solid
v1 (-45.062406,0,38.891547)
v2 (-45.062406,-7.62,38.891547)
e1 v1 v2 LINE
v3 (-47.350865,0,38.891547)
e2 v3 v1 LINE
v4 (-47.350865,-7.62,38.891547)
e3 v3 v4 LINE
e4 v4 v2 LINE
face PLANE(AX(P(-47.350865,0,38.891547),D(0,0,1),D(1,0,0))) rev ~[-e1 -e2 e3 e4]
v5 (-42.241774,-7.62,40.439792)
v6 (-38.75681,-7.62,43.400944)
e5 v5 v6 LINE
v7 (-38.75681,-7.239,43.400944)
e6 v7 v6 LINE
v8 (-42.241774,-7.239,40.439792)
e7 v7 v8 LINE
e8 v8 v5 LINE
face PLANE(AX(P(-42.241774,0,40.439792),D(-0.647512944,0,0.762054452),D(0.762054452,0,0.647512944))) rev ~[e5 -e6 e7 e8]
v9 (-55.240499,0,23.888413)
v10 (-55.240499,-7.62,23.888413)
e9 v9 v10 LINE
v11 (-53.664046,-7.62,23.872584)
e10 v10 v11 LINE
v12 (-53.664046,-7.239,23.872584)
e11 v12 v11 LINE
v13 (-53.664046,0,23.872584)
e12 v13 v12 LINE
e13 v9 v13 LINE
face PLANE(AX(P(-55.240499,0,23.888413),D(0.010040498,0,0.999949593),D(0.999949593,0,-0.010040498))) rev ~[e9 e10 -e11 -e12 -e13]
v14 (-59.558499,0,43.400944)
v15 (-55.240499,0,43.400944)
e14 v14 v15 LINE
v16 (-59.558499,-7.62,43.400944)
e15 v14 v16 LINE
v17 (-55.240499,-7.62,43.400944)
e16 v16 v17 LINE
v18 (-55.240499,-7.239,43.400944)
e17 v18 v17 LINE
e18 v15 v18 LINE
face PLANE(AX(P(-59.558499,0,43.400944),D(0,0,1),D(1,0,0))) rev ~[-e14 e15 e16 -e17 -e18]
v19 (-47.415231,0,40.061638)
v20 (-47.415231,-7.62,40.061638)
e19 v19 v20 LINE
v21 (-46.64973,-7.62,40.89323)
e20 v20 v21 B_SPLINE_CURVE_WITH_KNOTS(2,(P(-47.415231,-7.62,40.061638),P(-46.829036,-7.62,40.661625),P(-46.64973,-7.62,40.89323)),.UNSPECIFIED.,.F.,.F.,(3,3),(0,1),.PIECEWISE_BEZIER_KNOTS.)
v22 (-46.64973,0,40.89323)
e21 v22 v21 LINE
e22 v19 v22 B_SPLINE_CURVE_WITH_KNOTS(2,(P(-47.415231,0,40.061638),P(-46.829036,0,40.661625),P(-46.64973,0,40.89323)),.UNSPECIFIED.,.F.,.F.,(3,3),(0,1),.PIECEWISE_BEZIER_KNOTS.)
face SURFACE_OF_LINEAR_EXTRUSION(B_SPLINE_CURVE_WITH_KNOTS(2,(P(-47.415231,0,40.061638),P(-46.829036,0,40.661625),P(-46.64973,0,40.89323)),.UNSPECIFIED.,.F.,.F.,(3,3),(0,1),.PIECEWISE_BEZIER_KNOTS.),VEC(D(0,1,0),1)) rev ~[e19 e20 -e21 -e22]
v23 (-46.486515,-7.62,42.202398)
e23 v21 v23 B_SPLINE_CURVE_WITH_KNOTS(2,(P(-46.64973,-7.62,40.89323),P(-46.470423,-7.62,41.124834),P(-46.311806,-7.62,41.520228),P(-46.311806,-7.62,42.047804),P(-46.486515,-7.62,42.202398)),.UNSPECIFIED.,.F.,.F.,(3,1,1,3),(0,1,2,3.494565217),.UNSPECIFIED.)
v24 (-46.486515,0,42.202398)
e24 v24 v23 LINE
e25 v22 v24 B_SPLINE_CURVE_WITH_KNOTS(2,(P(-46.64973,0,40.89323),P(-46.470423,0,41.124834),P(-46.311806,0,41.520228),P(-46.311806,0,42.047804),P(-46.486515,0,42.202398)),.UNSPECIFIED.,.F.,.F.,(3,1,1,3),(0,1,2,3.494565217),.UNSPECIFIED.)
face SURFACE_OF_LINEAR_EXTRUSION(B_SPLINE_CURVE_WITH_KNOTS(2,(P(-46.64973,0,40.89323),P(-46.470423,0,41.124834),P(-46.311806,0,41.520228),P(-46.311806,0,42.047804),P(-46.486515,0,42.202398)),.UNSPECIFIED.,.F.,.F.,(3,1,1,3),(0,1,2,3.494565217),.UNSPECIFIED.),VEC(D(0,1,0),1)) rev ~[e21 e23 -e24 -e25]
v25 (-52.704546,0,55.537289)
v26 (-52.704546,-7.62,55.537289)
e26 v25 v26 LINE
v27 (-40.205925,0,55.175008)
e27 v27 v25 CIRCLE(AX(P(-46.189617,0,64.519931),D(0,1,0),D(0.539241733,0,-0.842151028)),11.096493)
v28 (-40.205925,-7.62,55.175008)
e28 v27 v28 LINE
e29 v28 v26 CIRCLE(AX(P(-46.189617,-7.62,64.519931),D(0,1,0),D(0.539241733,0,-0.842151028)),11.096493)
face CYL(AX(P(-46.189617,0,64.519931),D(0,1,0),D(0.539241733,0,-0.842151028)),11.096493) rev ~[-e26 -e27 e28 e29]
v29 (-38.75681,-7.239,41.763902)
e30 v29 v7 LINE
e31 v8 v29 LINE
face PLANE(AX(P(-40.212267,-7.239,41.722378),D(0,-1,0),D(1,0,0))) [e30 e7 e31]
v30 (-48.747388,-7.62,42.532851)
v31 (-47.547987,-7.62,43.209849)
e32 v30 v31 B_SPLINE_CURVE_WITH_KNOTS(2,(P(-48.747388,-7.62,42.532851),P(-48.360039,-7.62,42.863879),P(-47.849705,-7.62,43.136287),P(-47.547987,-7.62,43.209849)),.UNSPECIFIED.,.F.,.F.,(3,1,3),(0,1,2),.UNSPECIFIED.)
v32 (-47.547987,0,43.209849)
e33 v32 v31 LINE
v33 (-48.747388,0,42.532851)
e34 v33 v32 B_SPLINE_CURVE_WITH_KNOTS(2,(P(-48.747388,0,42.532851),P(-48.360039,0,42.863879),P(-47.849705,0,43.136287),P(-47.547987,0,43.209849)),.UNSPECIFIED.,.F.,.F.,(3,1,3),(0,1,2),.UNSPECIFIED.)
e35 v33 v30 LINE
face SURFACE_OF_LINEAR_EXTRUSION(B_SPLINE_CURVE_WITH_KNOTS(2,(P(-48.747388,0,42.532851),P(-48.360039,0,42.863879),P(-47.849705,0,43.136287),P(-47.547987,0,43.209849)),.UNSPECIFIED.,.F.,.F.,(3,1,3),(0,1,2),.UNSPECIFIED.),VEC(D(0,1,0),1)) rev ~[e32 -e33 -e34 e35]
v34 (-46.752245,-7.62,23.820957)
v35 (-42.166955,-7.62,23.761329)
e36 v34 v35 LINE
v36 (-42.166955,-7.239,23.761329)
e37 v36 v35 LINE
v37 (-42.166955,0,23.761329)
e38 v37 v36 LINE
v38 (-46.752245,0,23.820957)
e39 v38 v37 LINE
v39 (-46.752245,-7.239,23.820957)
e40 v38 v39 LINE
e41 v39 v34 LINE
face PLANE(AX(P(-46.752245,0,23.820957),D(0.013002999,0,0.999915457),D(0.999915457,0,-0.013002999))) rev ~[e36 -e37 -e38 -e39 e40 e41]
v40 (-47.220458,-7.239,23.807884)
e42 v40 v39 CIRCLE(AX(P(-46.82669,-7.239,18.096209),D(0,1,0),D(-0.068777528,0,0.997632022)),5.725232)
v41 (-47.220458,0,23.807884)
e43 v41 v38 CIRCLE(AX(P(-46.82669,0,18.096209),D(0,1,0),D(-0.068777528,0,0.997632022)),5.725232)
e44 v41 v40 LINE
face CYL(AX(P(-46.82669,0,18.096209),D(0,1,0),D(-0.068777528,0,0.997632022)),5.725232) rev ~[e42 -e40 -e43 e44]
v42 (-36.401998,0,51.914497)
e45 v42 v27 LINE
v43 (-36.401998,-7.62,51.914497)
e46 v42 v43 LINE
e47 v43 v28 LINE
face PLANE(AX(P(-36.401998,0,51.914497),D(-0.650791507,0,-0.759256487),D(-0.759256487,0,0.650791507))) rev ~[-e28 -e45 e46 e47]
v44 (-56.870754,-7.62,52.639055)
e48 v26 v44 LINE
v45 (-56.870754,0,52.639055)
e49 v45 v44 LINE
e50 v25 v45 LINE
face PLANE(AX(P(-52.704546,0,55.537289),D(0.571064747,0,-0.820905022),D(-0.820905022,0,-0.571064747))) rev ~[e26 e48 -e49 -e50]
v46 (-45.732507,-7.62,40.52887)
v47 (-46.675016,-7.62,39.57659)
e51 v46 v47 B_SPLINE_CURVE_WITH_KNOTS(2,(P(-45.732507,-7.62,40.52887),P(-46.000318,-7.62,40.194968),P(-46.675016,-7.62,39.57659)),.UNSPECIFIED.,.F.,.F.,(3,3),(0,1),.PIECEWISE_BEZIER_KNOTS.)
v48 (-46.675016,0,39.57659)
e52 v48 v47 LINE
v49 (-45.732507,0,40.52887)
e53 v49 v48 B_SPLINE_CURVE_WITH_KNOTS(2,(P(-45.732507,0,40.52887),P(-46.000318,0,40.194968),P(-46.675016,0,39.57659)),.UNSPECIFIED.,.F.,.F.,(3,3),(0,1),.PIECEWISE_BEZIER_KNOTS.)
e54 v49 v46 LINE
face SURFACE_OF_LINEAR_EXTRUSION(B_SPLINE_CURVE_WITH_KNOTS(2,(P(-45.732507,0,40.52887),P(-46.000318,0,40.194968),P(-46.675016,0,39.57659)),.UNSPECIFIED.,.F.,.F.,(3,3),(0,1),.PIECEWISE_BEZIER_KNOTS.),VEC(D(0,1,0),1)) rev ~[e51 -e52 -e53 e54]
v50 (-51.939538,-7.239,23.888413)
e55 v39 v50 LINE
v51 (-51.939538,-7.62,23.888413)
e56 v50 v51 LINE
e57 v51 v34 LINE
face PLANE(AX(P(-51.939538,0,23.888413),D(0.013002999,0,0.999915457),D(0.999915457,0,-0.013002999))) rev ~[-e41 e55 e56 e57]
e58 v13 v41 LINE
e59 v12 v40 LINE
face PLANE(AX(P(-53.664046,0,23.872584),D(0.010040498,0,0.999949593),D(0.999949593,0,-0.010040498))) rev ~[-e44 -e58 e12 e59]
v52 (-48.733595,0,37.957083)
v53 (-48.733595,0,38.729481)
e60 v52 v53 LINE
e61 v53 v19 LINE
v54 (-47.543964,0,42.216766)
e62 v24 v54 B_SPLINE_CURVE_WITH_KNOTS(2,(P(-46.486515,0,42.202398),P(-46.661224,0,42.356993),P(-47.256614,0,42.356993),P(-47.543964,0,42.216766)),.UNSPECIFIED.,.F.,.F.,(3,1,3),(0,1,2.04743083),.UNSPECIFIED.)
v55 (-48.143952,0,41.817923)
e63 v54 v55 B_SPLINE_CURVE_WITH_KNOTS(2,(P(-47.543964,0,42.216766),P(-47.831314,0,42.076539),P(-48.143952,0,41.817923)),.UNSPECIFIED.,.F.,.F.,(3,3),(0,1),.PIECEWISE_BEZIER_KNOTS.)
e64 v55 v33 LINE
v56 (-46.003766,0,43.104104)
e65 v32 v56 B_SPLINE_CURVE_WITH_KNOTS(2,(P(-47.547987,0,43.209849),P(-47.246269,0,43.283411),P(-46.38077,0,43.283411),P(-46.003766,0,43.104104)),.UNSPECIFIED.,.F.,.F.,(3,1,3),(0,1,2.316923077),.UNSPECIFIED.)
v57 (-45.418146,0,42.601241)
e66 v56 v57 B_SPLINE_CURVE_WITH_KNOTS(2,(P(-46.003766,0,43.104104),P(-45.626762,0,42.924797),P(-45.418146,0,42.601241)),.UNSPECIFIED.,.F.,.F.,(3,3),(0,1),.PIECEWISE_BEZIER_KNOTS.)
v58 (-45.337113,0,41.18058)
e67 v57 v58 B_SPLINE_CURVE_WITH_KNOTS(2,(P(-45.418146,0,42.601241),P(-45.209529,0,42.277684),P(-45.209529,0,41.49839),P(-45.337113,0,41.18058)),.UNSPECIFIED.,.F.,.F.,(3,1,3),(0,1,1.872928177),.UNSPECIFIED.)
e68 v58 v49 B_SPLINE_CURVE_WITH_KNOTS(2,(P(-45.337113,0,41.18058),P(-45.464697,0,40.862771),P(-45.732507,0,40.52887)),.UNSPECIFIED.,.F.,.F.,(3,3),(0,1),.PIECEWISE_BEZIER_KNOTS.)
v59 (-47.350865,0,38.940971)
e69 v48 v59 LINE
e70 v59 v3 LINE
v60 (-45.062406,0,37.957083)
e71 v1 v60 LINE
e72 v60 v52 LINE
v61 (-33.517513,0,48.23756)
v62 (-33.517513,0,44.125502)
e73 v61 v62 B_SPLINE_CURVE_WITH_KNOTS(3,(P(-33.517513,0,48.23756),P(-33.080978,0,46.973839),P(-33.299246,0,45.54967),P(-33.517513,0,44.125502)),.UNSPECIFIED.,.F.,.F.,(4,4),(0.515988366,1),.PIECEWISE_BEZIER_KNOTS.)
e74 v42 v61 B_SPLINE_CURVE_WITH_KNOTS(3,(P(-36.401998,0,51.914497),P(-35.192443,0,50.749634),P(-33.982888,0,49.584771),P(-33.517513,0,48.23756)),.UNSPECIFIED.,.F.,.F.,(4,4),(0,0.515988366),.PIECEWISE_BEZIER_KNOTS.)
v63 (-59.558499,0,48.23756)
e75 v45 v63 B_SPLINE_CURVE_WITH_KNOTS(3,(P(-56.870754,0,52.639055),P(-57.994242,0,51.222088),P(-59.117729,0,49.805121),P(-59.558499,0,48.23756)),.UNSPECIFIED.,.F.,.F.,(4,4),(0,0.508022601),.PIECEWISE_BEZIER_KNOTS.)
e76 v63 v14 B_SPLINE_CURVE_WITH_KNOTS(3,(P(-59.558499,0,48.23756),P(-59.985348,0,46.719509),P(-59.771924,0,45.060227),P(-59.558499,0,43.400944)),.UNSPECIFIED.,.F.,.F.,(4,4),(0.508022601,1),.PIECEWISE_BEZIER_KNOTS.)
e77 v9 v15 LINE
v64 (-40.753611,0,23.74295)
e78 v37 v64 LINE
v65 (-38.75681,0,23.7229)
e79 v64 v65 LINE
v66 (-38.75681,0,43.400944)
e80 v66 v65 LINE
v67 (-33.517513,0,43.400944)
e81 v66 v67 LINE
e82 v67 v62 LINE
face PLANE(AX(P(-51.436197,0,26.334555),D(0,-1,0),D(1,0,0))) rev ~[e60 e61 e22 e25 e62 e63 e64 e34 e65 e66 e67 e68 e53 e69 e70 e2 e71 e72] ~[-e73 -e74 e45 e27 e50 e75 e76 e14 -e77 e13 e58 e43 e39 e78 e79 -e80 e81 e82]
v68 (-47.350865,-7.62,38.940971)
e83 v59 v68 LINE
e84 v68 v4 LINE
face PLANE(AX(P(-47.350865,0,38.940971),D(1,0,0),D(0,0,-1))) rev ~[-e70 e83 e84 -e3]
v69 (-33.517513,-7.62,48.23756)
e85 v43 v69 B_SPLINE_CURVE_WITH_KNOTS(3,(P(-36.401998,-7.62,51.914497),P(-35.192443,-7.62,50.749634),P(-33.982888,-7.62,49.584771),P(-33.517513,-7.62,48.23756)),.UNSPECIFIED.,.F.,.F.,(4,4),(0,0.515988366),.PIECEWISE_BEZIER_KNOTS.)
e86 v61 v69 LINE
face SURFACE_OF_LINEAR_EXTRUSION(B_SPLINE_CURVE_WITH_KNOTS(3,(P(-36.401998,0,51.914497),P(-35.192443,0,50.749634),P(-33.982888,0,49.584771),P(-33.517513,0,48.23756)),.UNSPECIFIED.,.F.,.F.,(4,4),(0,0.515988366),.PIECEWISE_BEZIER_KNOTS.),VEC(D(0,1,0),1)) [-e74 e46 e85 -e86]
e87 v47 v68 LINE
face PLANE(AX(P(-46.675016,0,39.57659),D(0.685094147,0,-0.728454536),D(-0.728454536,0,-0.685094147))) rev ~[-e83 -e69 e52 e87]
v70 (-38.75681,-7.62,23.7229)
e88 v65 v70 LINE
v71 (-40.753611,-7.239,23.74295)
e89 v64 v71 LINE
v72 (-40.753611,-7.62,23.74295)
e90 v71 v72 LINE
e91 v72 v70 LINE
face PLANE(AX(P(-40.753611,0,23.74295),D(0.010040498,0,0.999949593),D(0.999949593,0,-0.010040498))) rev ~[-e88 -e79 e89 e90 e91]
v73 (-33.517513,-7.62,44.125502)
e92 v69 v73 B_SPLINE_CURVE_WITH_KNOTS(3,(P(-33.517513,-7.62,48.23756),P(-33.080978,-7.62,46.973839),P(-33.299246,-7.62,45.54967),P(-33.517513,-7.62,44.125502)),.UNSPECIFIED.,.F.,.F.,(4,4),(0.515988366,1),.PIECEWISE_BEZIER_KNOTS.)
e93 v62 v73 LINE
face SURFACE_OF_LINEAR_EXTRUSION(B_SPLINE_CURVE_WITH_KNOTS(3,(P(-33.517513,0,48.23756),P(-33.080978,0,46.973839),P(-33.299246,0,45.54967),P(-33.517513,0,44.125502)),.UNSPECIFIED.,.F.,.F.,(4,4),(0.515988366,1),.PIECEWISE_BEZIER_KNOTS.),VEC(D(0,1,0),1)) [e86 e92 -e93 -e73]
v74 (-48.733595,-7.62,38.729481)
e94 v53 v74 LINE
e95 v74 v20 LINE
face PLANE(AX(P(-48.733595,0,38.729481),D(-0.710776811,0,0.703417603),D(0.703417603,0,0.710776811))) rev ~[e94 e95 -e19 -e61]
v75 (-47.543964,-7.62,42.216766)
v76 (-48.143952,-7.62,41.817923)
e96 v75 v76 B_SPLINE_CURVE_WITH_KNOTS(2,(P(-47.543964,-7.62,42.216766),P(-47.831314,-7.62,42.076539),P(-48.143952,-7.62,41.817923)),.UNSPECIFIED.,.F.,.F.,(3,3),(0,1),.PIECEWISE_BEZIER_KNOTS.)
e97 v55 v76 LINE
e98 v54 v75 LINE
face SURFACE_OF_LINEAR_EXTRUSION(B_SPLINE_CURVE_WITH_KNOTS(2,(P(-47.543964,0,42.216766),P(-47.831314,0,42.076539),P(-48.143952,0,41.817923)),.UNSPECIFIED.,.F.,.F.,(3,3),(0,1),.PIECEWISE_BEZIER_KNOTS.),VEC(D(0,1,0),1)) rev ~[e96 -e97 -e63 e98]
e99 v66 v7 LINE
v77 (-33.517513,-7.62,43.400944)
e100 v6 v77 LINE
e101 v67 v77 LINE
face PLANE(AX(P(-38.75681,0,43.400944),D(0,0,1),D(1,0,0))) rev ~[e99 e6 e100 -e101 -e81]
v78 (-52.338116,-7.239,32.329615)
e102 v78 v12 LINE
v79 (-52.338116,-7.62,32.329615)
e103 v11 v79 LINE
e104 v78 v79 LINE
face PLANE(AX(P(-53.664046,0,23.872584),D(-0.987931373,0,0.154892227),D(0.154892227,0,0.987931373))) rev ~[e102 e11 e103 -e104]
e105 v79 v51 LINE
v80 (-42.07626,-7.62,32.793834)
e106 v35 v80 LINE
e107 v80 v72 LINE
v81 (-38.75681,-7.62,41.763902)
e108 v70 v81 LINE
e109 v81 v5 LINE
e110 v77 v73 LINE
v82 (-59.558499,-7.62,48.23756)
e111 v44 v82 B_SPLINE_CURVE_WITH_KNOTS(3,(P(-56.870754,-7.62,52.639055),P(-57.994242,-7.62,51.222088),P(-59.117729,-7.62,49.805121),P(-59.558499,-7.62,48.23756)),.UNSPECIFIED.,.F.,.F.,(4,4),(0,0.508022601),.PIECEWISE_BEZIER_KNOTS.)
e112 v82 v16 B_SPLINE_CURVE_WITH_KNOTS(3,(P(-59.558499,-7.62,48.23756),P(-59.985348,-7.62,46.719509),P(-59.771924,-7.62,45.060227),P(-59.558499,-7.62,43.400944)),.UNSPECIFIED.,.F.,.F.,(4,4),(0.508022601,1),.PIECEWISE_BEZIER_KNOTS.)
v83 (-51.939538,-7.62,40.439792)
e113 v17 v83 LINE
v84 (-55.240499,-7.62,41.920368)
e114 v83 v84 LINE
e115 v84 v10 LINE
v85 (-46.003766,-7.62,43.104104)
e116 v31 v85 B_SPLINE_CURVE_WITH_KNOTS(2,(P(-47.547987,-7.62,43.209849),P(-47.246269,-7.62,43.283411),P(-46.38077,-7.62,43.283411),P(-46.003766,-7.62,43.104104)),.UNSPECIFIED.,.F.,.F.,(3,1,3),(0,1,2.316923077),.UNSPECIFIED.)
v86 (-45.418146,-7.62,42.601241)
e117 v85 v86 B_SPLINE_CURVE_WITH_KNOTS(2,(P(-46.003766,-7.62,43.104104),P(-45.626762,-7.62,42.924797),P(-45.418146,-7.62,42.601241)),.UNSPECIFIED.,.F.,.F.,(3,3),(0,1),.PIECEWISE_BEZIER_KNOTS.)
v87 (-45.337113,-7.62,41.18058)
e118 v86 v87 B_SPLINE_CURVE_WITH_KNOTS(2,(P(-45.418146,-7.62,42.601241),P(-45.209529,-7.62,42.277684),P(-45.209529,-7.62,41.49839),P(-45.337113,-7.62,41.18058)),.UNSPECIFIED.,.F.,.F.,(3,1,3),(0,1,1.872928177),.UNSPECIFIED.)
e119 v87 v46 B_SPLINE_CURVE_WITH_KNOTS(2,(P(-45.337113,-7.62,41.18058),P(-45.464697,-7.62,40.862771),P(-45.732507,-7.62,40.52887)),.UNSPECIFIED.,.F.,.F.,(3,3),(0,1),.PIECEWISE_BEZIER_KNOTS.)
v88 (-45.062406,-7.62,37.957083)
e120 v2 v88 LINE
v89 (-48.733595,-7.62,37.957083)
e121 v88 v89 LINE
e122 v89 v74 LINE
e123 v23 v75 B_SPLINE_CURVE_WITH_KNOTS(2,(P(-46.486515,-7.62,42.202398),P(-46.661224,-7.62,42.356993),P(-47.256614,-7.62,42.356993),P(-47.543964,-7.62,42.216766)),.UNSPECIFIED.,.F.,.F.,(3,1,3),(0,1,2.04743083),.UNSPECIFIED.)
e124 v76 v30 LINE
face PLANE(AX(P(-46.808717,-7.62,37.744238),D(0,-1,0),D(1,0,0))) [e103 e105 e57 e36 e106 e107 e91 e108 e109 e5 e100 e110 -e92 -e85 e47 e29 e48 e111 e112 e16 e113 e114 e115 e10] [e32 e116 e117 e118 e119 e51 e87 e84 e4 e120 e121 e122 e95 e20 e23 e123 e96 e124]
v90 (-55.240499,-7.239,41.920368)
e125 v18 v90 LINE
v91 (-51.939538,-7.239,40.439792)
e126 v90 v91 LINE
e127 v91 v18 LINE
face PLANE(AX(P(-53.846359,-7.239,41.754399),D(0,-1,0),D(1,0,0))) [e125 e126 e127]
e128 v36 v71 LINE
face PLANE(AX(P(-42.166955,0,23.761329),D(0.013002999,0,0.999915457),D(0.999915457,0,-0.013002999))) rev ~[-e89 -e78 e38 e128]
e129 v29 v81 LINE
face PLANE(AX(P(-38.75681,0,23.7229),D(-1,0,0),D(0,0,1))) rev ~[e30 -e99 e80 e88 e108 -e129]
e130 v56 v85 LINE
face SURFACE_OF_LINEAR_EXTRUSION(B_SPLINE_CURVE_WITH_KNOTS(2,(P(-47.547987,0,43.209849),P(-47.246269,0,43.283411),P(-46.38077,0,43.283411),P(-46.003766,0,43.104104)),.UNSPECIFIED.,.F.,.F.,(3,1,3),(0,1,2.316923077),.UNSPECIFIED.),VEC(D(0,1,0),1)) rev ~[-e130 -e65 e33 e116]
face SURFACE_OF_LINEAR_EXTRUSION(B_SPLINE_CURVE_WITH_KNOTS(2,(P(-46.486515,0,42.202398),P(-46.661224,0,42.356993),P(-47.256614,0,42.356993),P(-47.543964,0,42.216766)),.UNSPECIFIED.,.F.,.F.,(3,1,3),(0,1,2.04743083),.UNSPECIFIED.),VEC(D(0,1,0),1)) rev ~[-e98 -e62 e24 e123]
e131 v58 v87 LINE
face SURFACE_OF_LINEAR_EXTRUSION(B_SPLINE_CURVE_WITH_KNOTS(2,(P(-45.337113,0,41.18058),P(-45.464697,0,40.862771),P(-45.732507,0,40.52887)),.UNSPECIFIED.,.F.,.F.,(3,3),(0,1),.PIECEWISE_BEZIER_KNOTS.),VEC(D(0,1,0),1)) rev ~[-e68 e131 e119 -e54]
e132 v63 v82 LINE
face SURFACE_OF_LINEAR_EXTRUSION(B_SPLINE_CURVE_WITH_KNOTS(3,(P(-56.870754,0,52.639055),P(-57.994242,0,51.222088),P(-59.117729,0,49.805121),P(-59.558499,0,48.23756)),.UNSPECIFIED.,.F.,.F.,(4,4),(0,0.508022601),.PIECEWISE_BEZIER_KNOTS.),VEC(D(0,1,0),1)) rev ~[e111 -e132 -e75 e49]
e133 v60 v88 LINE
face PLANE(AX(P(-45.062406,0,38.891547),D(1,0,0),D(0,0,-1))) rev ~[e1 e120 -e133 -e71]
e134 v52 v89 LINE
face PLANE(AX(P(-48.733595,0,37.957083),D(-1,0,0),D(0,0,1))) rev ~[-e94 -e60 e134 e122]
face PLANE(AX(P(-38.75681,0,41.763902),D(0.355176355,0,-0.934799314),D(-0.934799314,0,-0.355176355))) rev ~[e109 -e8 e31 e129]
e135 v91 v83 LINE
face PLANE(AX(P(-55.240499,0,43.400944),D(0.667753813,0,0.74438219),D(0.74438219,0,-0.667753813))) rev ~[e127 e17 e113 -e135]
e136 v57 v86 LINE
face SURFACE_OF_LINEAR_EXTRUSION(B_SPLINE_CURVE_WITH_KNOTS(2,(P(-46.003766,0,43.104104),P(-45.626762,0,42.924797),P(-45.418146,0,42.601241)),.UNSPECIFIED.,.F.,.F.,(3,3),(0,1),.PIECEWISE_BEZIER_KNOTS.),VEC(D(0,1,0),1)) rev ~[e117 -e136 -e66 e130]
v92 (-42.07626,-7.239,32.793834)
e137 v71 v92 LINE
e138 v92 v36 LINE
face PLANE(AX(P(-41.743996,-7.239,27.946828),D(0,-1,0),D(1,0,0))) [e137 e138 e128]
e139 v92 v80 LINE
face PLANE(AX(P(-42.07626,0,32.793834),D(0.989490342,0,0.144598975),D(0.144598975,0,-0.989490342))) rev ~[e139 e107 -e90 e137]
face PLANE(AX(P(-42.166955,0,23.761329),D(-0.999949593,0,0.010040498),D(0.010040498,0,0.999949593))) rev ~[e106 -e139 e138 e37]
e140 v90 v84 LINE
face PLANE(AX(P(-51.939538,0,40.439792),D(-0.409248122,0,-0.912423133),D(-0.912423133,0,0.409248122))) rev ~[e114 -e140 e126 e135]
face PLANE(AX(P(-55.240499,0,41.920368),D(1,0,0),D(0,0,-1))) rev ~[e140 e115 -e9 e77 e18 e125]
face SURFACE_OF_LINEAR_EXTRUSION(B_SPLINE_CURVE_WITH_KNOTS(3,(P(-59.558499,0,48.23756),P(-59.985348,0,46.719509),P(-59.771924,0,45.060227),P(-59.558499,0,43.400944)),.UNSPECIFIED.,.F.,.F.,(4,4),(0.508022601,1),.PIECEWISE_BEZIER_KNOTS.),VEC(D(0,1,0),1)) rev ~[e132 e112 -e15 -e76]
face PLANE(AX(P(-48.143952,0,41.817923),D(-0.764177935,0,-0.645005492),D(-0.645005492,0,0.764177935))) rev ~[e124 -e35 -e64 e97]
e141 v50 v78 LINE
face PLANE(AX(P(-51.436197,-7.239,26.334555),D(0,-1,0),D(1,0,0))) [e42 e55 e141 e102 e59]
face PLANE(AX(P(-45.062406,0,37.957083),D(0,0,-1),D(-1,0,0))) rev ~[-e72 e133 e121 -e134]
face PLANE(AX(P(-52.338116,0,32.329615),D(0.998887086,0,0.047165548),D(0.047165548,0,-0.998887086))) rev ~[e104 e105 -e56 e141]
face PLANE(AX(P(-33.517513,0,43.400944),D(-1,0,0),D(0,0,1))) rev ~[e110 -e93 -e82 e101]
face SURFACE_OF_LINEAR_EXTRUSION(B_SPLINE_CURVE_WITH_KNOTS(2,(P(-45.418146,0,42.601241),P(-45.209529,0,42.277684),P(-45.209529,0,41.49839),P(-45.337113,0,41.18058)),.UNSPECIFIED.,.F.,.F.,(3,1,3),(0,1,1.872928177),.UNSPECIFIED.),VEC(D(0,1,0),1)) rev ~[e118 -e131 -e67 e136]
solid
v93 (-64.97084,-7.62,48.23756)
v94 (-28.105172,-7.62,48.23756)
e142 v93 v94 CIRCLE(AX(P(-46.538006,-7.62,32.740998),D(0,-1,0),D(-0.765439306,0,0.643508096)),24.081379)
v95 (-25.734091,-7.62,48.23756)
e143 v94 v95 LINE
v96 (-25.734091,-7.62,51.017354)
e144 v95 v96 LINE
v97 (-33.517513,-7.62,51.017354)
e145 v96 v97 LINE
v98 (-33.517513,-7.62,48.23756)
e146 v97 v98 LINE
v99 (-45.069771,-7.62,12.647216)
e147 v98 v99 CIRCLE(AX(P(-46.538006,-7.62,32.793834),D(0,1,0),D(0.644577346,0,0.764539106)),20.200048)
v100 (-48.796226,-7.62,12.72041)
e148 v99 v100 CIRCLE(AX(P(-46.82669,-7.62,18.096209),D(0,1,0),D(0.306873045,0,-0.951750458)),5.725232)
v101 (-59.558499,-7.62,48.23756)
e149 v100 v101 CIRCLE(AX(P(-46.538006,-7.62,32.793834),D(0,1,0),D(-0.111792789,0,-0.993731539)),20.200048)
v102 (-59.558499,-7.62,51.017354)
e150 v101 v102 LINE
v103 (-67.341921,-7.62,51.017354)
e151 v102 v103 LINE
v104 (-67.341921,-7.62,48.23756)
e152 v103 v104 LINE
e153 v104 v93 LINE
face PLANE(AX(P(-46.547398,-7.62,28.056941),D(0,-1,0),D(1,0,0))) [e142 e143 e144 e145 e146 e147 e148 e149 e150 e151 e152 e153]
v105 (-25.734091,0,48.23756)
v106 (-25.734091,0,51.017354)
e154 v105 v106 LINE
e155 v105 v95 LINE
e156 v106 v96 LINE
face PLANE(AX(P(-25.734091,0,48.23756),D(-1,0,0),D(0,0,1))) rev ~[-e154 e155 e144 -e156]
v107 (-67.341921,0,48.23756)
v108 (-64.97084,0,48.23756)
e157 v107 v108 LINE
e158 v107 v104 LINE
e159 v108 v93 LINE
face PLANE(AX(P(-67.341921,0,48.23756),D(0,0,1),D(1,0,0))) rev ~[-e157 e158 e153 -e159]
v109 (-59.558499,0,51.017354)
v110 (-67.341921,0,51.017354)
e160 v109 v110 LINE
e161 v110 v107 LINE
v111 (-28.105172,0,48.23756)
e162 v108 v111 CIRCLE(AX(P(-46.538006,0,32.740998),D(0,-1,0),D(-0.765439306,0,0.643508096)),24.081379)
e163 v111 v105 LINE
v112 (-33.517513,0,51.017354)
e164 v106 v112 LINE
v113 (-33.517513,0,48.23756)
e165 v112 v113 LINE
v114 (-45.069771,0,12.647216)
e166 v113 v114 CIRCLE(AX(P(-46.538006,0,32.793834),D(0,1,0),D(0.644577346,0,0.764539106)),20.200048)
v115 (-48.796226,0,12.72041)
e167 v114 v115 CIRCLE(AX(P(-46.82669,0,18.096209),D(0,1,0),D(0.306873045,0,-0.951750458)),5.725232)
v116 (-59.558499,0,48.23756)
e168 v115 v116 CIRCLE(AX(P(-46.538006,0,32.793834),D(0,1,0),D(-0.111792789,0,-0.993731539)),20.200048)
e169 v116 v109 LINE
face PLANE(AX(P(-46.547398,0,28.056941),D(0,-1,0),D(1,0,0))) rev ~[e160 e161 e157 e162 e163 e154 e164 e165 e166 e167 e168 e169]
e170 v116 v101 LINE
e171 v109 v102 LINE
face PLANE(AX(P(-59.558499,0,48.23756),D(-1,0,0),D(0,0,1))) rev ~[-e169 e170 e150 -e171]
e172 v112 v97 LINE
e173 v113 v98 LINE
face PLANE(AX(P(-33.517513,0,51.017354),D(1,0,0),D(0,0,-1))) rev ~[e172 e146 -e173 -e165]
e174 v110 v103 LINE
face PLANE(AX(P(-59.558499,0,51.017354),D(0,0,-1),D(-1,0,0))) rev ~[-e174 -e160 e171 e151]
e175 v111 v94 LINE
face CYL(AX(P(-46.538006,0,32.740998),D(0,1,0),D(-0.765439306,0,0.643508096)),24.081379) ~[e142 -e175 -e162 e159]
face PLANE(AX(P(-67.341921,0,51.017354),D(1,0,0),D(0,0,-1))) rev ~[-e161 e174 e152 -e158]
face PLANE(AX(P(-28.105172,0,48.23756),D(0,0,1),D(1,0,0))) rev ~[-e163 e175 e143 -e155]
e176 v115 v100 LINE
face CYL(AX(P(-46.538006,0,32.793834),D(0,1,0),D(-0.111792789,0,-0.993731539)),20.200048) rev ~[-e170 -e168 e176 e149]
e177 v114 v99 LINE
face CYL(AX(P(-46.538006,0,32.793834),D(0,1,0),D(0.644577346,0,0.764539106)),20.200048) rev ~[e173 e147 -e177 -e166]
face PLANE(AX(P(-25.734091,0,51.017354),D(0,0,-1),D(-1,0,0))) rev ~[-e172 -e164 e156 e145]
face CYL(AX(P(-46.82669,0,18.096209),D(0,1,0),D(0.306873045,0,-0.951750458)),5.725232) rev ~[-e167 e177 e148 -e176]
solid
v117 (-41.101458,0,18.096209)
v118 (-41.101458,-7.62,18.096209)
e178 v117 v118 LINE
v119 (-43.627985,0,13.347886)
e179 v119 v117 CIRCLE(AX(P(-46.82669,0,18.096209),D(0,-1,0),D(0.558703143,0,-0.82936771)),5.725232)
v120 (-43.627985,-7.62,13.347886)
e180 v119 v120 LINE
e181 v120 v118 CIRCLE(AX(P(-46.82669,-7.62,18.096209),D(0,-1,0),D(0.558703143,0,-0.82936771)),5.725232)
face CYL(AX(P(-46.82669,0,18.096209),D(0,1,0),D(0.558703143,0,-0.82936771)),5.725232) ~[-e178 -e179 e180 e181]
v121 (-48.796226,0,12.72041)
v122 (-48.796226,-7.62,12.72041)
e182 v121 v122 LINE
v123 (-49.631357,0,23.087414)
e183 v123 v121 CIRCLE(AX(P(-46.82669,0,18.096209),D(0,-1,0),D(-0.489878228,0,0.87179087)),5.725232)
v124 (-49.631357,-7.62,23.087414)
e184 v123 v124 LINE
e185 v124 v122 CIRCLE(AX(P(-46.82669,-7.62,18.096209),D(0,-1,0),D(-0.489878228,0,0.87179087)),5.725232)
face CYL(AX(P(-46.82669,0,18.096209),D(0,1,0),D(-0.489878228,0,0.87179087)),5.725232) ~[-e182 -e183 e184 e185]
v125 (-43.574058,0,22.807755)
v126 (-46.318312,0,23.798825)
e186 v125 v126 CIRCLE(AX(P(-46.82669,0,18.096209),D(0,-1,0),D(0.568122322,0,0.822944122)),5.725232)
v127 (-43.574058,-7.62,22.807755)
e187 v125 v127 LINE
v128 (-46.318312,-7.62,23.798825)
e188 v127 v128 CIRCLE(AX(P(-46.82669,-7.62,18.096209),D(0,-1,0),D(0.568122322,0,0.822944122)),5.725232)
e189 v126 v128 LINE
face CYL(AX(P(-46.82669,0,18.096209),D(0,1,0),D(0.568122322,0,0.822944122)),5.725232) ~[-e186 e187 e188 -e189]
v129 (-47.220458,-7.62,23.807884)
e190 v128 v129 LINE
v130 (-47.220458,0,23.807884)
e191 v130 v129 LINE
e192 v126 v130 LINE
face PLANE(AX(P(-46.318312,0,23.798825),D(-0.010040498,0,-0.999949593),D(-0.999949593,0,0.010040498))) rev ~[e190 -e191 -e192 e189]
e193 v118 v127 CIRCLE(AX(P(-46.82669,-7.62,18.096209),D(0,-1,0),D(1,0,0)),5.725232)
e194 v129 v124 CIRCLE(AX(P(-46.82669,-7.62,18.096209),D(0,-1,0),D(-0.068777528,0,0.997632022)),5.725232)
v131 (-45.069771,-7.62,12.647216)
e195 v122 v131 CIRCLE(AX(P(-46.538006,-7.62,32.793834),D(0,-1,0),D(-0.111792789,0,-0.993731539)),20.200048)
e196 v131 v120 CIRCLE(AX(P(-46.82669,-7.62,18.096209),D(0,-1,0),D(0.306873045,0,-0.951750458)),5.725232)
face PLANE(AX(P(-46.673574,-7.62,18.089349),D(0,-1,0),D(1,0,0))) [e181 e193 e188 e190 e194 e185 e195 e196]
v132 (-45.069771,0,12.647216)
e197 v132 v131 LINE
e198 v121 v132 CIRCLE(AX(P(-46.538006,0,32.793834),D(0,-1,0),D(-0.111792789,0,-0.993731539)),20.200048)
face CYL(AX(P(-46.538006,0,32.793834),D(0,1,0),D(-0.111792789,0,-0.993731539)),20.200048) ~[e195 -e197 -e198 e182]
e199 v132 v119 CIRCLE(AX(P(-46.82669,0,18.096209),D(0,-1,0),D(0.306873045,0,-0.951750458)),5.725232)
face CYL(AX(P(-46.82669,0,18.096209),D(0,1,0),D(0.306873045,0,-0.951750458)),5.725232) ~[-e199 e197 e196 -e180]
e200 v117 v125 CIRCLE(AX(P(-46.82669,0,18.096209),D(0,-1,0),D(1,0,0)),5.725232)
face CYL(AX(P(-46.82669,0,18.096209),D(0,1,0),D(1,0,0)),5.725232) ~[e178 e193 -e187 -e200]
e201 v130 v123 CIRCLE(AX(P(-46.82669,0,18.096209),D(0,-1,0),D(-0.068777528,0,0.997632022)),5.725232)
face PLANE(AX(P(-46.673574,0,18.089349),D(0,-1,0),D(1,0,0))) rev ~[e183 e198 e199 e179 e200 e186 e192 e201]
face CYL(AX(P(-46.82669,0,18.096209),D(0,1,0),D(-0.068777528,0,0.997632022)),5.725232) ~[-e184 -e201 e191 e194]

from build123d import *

# Parameters (mm, degrees)
F1_DEPTH = 7.62
F2_DEPTH = 7.239


# Not quite as in the source:
# - the program builds the solid bodies; features that only make, move or delete a surface that nothing else refers to are left out


with BuildPart() as f1:
    # F0 (on Front) → F1 (new body)
    with BuildSketch(Plane.XZ):
        with BuildLine():
            Line((-59.5584991262, 48.2375602462), (-64.9708399911, 48.2375602462))
            ThreePointArc((-64.9708399911, 48.2375602462), (-46.5380060703, 8.6596191309), (-28.1051721496, 48.2375602462))
            Line((-28.1051721496, 48.2375602462), (-33.5175130144, 48.2375602462))
            ThreePointArc((-33.5175130144, 48.2375602462), (-27.3247565054, 26.5574116364), (-45.0697709813, 12.6472161608))
            ThreePointArc((-45.0697709813, 12.6472161608), (-46.9391212719, 12.3720803787), (-48.7962257348, 12.7204095643))
            ThreePointArc((-48.7962257348, 12.7204095643), (-65.87002003, 26.9359197848), (-59.5584991262, 48.2375602462))
        make_face()
        Polygon((-67.3419212263, 48.2375602462), (-64.9708399911, 48.2375602462), (-59.5584991262, 48.2375602462), (-59.5584991262, 51.0173538534), (-67.3419212263, 51.0173538534), align=None)
        Polygon((-33.5175130144, 48.2375602462), (-28.1051721496, 48.2375602462), (-25.7340909143, 48.2375602462), (-25.7340909143, 51.0173538534), (-33.5175130144, 51.0173538534), align=None)
    extrude(amount=F1_DEPTH)


with BuildPart() as f1b:
    # F0 (on Front) → F1, piece 2 (new body)
    with BuildSketch(Plane.XZ):
        with BuildLine():
            add(Edge.make_bspline(
                [(-56.8707543748, 52.6390547806), (-57.9942418052, 51.2220877516), (-59.1177292355, 49.8051207226), (-59.5584991262, 48.2375602462)],
                knots=[0, 0, 0, 0, 0.5080226009, 0.5080226009, 0.5080226009, 0.5080226009], degree=3))
            add(Edge.make_bspline(
                [(-59.5584991262, 48.2375602462), (-59.9853479003, 46.7195090321), (-59.7719235132, 45.0602267275), (-59.5584991262, 43.4009444229)],
                knots=[0.5080226009, 0.5080226009, 0.5080226009, 0.5080226009, 1, 1, 1, 1], degree=3))
            Line((-59.5584991262, 43.4009444229), (-55.2404991262, 43.4009444229))
            Line((-55.2404991262, 43.4009444229), (-51.9395383562, 40.4397919774))
            Line((-51.9395383562, 40.4397919774), (-55.2404991262, 41.9203682002))
            Line((-55.2404991262, 41.9203682002), (-55.2404991262, 23.888412863))
            Line((-55.2404991262, 23.888412863), (-53.664046478, 23.8725836956))
            Line((-53.664046478, 23.8725836956), (-52.338115871, 32.3296152055))
            Line((-52.338115871, 32.3296152055), (-51.9395383562, 23.888412863))
            Line((-51.9395383562, 23.888412863), (-46.7522454605, 23.8209567953))
            Line((-46.7522454605, 23.8209567953), (-42.1669552674, 23.7613292301))
            Line((-42.1669552674, 23.7613292301), (-42.0762598515, 32.7938339318))
            Line((-42.0762598515, 32.7938339318), (-40.753610712, 23.7429499583))
            Line((-40.753610712, 23.7429499583), (-38.7568103386, 23.7229000777))
            Line((-38.7568103386, 23.7229000777), (-38.7568103386, 41.7639017105))
            Line((-38.7568103386, 41.7639017105), (-42.2417744994, 40.4397919774))
            Line((-42.2417744994, 40.4397919774), (-38.7568103386, 43.4009444229))
            Line((-38.7568103386, 43.4009444229), (-33.5175130144, 43.4009444229))
            Line((-33.5175130144, 43.4009444229), (-33.5175130144, 44.1255018582))
            add(Edge.make_bspline(
                [(-33.5175130144, 48.2375602462), (-33.0809784188, 46.9738387084), (-33.2992457166, 45.5496702833), (-33.5175130144, 44.1255018582)],
                knots=[0.5159883661, 0.5159883661, 0.5159883661, 0.5159883661, 1, 1, 1, 1], degree=3))
            add(Edge.make_bspline(
                [(-36.4019976546, 51.9144973453), (-35.1924426885, 50.7496341038), (-33.9828877223, 49.5847708622), (-33.5175130144, 48.2375602462)],
                knots=[0, 0, 0, 0, 0.5159883661, 0.5159883661, 0.5159883661, 0.5159883661], degree=3))
            Line((-36.4019976546, 51.9144973453), (-40.2059252092, 55.1750078426))
            ThreePointArc((-40.2059252092, 55.1750078426), (-46.5111214901, 53.4280963412), (-52.7045460642, 55.5372885988))
            Line((-52.7045460642, 55.5372885988), (-56.8707543748, 52.6390547806))
        make_face()
        with BuildLine():
            Line((-45.0624059546, 38.8915469496), (-45.0624059546, 37.9570834339))
            Line((-45.0624059546, 37.9570834339), (-48.7335947239, 37.9570834339))
            Line((-48.7335947239, 37.9570834339), (-48.7335947239, 38.7294813214))
            Line((-48.7335947239, 38.7294813214), (-47.4152310675, 40.0616377972))
            add(Edge.make_bspline(
                [(-47.4152310675, 40.0616377972), (-46.8290362421, 40.661625442), (-46.6497295897, 40.8932298681)],
                knots=[0, 0, 0, 1, 1, 1], degree=2))
            add(Edge.make_bspline(
                [(-46.6497295897, 40.8932298681), (-46.4704229372, 41.1248342942), (-46.3911142255, 41.3225313726)],
                knots=[0, 0, 0, 1, 1, 1], degree=2))
            add(Edge.make_bspline(
                [(-46.3911142255, 41.3225313726), (-46.3118055138, 41.520228451), (-46.3118055138, 41.7317183488)],
                knots=[0, 0, 0, 1, 1, 1], degree=2))
            add(Edge.make_bspline(
                [(-46.3118055138, 41.7317183488), (-46.3118055138, 42.0478037938), (-46.4865145598, 42.2023983115)],
                knots=[0, 0, 0, 1, 1, 1], degree=2))
            add(Edge.make_bspline(
                [(-46.4865145598, 42.2023983115), (-46.6612236059, 42.3569928292), (-46.9520222153, 42.3569928292)],
                knots=[0, 0, 0, 1, 1, 1], degree=2))
            add(Edge.make_bspline(
                [(-46.9520222153, 42.3569928292), (-47.2566136442, 42.3569928292), (-47.5439640488, 42.2167658318)],
                knots=[0, 0, 0, 1, 1, 1], degree=2))
            add(Edge.make_bspline(
                [(-47.5439640488, 42.2167658318), (-47.8313144534, 42.0765388343), (-48.1439516936, 41.8179234702)],
                knots=[0, 0, 0, 1, 1, 1], degree=2))
            Line((-48.1439516936, 41.8179234702), (-48.7473875433, 42.5328512768))
            add(Edge.make_bspline(
                [(-48.7473875433, 42.5328512768), (-48.3600391979, 42.8638789429), (-48.1048720386, 43.0000830347)],
                knots=[0, 0, 0, 1, 1, 1], degree=2))
            add(Edge.make_bspline(
                [(-48.1048720386, 43.0000830347), (-47.8497048793, 43.1362871265), (-47.5479869545, 43.2098488301)],
                knots=[0, 0, 0, 1, 1, 1], degree=2))
            add(Edge.make_bspline(
                [(-47.5479869545, 43.2098488301), (-47.2462690296, 43.2834105337), (-46.8727135036, 43.2834105337)],
                knots=[0, 0, 0, 1, 1, 1], degree=2))
            add(Edge.make_bspline(
                [(-46.8727135036, 43.2834105337), (-46.380769611, 43.2834105337), (-46.0037658801, 43.1041038812)],
                knots=[0, 0, 0, 1, 1, 1], degree=2))
            add(Edge.make_bspline(
                [(-46.0037658801, 43.1041038812), (-45.6267621493, 42.9247972287), (-45.4181457555, 42.6012406731)],
                knots=[0, 0, 0, 1, 1, 1], degree=2))
            add(Edge.make_bspline(
                [(-45.4181457555, 42.6012406731), (-45.2095293618, 42.2776841175), (-45.2095293618, 41.8616007317)],
                knots=[0, 0, 0, 1, 1, 1], degree=2))
            add(Edge.make_bspline(
                [(-45.2095293618, 41.8616007317), (-45.2095293618, 41.4983898202), (-45.3371129414, 41.1805802727)],
                knots=[0, 0, 0, 1, 1, 1], degree=2))
            add(Edge.make_bspline(
                [(-45.3371129414, 41.1805802727), (-45.4646965211, 40.8627707252), (-45.7325070982, 40.5288695551)],
                knots=[0, 0, 0, 1, 1, 1], degree=2))
            add(Edge.make_bspline(
                [(-45.7325070982, 40.5288695551), (-46.0003176753, 40.1949683849), (-46.6750164253, 39.5765903142)],
                knots=[0, 0, 0, 1, 1, 1], degree=2))
            Line((-46.6750164253, 39.5765903142), (-47.3508645769, 38.9409712192))
            Line((-47.3508645769, 38.9409712192), (-47.3508645769, 38.8915469496))
            Line((-47.3508645769, 38.8915469496), (-45.0624059546, 38.8915469496))
        make_face(mode=Mode.SUBTRACT)
    extrude(amount=F1_DEPTH)

    # F0 (on Front) → F2 (join)
    with BuildSketch(Plane.XZ):
        with BuildLine():
            Line((-53.664046478, 23.8725836956), (-47.2204577548, 23.8078835954))
            ThreePointArc((-47.2204577548, 23.8078835954), (-46.9864853573, 23.8192103943), (-46.7522454605, 23.8209567953))
            Line((-46.7522454605, 23.8209567953), (-51.9395383562, 23.888412863))
            Line((-51.9395383562, 23.888412863), (-52.338115871, 32.3296152055))
            Line((-52.338115871, 32.3296152055), (-53.664046478, 23.8725836956))
        make_face()
        Polygon((-42.1669552674, 23.7613292301), (-40.753610712, 23.7429499583), (-42.0762598515, 32.7938339318), align=None)
        Polygon((-51.9395383562, 40.4397919774), (-55.2404991262, 43.4009444229), (-55.2404991262, 41.9203682002), align=None)
        Polygon((-38.7568103386, 41.7639017105), (-38.7568103386, 43.4009444229), (-42.2417744994, 40.4397919774), align=None)
    extrude(amount=F2_DEPTH)


with BuildPart() as f1c:
    # F0 (on Front) → F1, piece 3 (new body)
    with BuildSketch(Plane.XZ):
        with BuildLine():
            ThreePointArc((-49.9709981221, 13.3116904732), (-49.4006466899, 12.9822049089), (-48.7962257348, 12.7204095643))
            ThreePointArc((-48.7962257348, 12.7204095643), (-46.9346901082, 12.5976817324), (-45.0697709813, 12.6472161608))
            ThreePointArc((-45.0697709813, 12.6472161608), (-44.3242339331, 12.9468400942), (-43.6279851846, 13.3478858171))
            ThreePointArc((-43.6279851846, 13.3478858171), (-43.7477560192, 13.547239909), (-43.8622818599, 13.7496527016))
            ThreePointArc((-43.8622818599, 13.7496527016), (-44.0069124158, 14.0244973728), (-44.141874165, 14.3042167273))
            ThreePointArc((-44.141874165, 14.3042167273), (-44.2788871247, 14.6169348112), (-44.4038162039, 14.9346735031))
            ThreePointArc((-44.4038162039, 14.9346735031), (-44.524631527, 15.2819339234), (-44.6310139513, 15.6338840926))
            ThreePointArc((-44.6310139513, 15.6338840926), (-44.7241488842, 15.9957276415), (-44.8020281543, 16.3611584679))
            ThreePointArc((-44.8020281543, 16.3611584679), (-44.8689286768, 16.7596883146), (-44.917686063, 17.1608421952))
            ThreePointArc((-44.917686063, 17.1608421952), (-44.9461032037, 17.5257356006), (-44.9595074387, 17.8914883281))
            ThreePointArc((-44.9595074387, 17.8914883281), (-44.9587241846, 18.2204976343), (-44.945791906, 18.5492536124))
            ThreePointArc((-44.945791906, 18.5492536124), (-44.9154647205, 18.9309840033), (-44.8687597947, 19.311058311))
            ThreePointArc((-44.8687597947, 19.311058311), (-44.7993413756, 19.7224063942), (-44.7107409222, 20.13005345))
            ThreePointArc((-44.7107409222, 20.13005345), (-44.6269832671, 20.4500506858), (-44.5314031498, 20.7667177299))
            ThreePointArc((-44.5314031498, 20.7667177299), (-44.4182724978, 21.0956811982), (-44.292384048, 21.4199767518))
            ThreePointArc((-44.292384048, 21.4199767518), (-44.1668612228, 21.7106973118), (-44.0310848775, 21.9967728398))
            ThreePointArc((-44.0310848775, 21.9967728398), (-43.9091335777, 22.2334098214), (-43.7801657509, 22.4662970908))
            ThreePointArc((-43.7801657509, 22.4662970908), (-43.6790232251, 22.6381795939), (-43.5740581992, 22.8077547948))
            ThreePointArc((-43.5740581992, 22.8077547948), (-44.8819912009, 23.4810418249), (-46.3183121682, 23.7988251479))
            Line((-46.3183121682, 23.7988251479), (-47.2204577548, 23.8078835954))
            ThreePointArc((-47.2204577548, 23.8078835954), (-48.4659781229, 23.5817368193), (-49.631357065, 23.0874137743))
            ThreePointArc((-49.631357065, 23.0874137743), (-49.4399703042, 22.8012645954), (-49.2608678419, 22.507270458))
            ThreePointArc((-49.2608678419, 22.507270458), (-49.0909371231, 22.1994140873), (-48.934476517, 21.8844981097))
            ThreePointArc((-48.934476517, 21.8844981097), (-48.7796011354, 21.533843634), (-48.6414253274, 21.1762791067))
            ThreePointArc((-48.6414253274, 21.1762791067), (-48.5264267045, 20.8325949559), (-48.4268576249, 20.4841276301))
            ThreePointArc((-48.4268576249, 20.4841276301), (-48.3512675692, 20.1700219292), (-48.2882156381, 19.8531612313))
            ThreePointArc((-48.2882156381, 19.8531612313), (-48.2364890834, 19.5244720475), (-48.1982539758, 19.1939417273))
            ThreePointArc((-48.1982539758, 19.1939417273), (-48.1743949079, 18.8771098565), (-48.1629326852, 18.5595877205))
            ThreePointArc((-48.1629326852, 18.5595877205), (-48.1640132648, 18.2362473997), (-48.1779489959, 17.9132057212))
            ThreePointArc((-48.1779489959, 17.9132057212), (-48.200015614, 17.6379014311), (-48.2314197618, 17.3635054266))
            ThreePointArc((-48.2314197618, 17.3635054266), (-48.2744314156, 17.0765495957), (-48.3276546289, 16.7913112028))
            ThreePointArc((-48.3276546289, 16.7913112028), (-48.4096419855, 16.4329658061), (-48.5077428192, 16.0786924987))
            ThreePointArc((-48.5077428192, 16.0786924987), (-48.5962780883, 15.8028375106), (-48.6945848527, 15.5303118267))
            ThreePointArc((-48.6945848527, 15.5303118267), (-48.807250429, 15.2503283661), (-48.9302291917, 14.9747190516))
            ThreePointArc((-48.9302291917, 14.9747190516), (-49.0672773505, 14.6962471277), (-49.2148536279, 14.4232085726))
            ThreePointArc((-49.2148536279, 14.4232085726), (-49.341263487, 14.2074529376), (-49.4742483135, 13.9956865985))
            ThreePointArc((-49.4742483135, 13.9956865985), (-49.6022091028, 13.8046791412), (-49.7355192028, 13.6173659555))
            ThreePointArc((-49.7355192028, 13.6173659555), (-49.8514451058, 13.4631311302), (-49.9709981221, 13.3116904732))
        make_face()
        with BuildLine():
            ThreePointArc((-49.631357065, 23.0874137743), (-52.5484703481, 18.2950021878), (-49.9709981221, 13.3116904732))
            ThreePointArc((-49.9709981221, 13.3116904732), (-49.8514451058, 13.4631311302), (-49.7355192028, 13.6173659555))
            ThreePointArc((-49.7355192028, 13.6173659555), (-49.6022091028, 13.8046791412), (-49.4742483135, 13.9956865985))
            ThreePointArc((-49.4742483135, 13.9956865985), (-49.341263487, 14.2074529376), (-49.2148536279, 14.4232085726))
            ThreePointArc((-49.2148536279, 14.4232085726), (-49.0672773505, 14.6962471277), (-48.9302291917, 14.9747190516))
            ThreePointArc((-48.9302291917, 14.9747190516), (-48.807250429, 15.2503283661), (-48.6945848527, 15.5303118267))
            ThreePointArc((-48.6945848527, 15.5303118267), (-48.5962780883, 15.8028375106), (-48.5077428192, 16.0786924987))
            ThreePointArc((-48.5077428192, 16.0786924987), (-48.4096419855, 16.4329658061), (-48.3276546289, 16.7913112028))
            ThreePointArc((-48.3276546289, 16.7913112028), (-48.2744314156, 17.0765495957), (-48.2314197618, 17.3635054266))
            ThreePointArc((-48.2314197618, 17.3635054266), (-48.200015614, 17.6379014311), (-48.1779489959, 17.9132057212))
            ThreePointArc((-48.1779489959, 17.9132057212), (-48.1640132648, 18.2362473997), (-48.1629326852, 18.5595877205))
            ThreePointArc((-48.1629326852, 18.5595877205), (-48.1743949079, 18.8771098565), (-48.1982539758, 19.1939417273))
            ThreePointArc((-48.1982539758, 19.1939417273), (-48.2364890834, 19.5244720475), (-48.2882156381, 19.8531612313))
            ThreePointArc((-48.2882156381, 19.8531612313), (-48.3512675692, 20.1700219292), (-48.4268576249, 20.4841276301))
            ThreePointArc((-48.4268576249, 20.4841276301), (-48.5264267045, 20.8325949559), (-48.6414253274, 21.1762791067))
            ThreePointArc((-48.6414253274, 21.1762791067), (-48.7796011354, 21.533843634), (-48.934476517, 21.8844981097))
            ThreePointArc((-48.934476517, 21.8844981097), (-49.0909371231, 22.1994140873), (-49.2608678419, 22.507270458))
            ThreePointArc((-49.2608678419, 22.507270458), (-49.4399703042, 22.8012645954), (-49.631357065, 23.0874137743))
        make_face()
        with BuildLine():
            ThreePointArc((-43.8622818599, 13.7496527016), (-43.7477560192, 13.547239909), (-43.6279851846, 13.3478858171))
            ThreePointArc((-43.6279851846, 13.3478858171), (-41.7724043969, 15.4068820932), (-41.1014581894, 18.0962085724))
            ThreePointArc((-41.1014581894, 18.0962085724), (-41.7571559778, 20.7566793303), (-43.5740581992, 22.8077547948))
            ThreePointArc((-43.5740581992, 22.8077547948), (-43.6790232251, 22.6381795939), (-43.7801657509, 22.4662970908))
            ThreePointArc((-43.7801657509, 22.4662970908), (-43.9091335777, 22.2334098214), (-44.0310848775, 21.9967728398))
            ThreePointArc((-44.0310848775, 21.9967728398), (-44.1668612228, 21.7106973118), (-44.292384048, 21.4199767518))
            ThreePointArc((-44.292384048, 21.4199767518), (-44.4182724978, 21.0956811982), (-44.5314031498, 20.7667177299))
            ThreePointArc((-44.5314031498, 20.7667177299), (-44.6269832671, 20.4500506858), (-44.7107409222, 20.13005345))
            ThreePointArc((-44.7107409222, 20.13005345), (-44.7993413756, 19.7224063942), (-44.8687597947, 19.311058311))
            ThreePointArc((-44.8687597947, 19.311058311), (-44.9154647205, 18.9309840033), (-44.945791906, 18.5492536124))
            ThreePointArc((-44.945791906, 18.5492536124), (-44.9587241846, 18.2204976343), (-44.9595074387, 17.8914883281))
            ThreePointArc((-44.9595074387, 17.8914883281), (-44.9461032037, 17.5257356006), (-44.917686063, 17.1608421952))
            ThreePointArc((-44.917686063, 17.1608421952), (-44.8689286768, 16.7596883146), (-44.8020281543, 16.3611584679))
            ThreePointArc((-44.8020281543, 16.3611584679), (-44.7241488842, 15.9957276415), (-44.6310139513, 15.6338840926))
            ThreePointArc((-44.6310139513, 15.6338840926), (-44.524631527, 15.2819339234), (-44.4038162039, 14.9346735031))
            ThreePointArc((-44.4038162039, 14.9346735031), (-44.2788871247, 14.6169348112), (-44.141874165, 14.3042167273))
            ThreePointArc((-44.141874165, 14.3042167273), (-44.0069124158, 14.0244973728), (-43.8622818599, 13.7496527016))
        make_face()
    extrude(amount=F1_DEPTH)


solid = Compound([f1.part, f1b.part, f1c.part])
